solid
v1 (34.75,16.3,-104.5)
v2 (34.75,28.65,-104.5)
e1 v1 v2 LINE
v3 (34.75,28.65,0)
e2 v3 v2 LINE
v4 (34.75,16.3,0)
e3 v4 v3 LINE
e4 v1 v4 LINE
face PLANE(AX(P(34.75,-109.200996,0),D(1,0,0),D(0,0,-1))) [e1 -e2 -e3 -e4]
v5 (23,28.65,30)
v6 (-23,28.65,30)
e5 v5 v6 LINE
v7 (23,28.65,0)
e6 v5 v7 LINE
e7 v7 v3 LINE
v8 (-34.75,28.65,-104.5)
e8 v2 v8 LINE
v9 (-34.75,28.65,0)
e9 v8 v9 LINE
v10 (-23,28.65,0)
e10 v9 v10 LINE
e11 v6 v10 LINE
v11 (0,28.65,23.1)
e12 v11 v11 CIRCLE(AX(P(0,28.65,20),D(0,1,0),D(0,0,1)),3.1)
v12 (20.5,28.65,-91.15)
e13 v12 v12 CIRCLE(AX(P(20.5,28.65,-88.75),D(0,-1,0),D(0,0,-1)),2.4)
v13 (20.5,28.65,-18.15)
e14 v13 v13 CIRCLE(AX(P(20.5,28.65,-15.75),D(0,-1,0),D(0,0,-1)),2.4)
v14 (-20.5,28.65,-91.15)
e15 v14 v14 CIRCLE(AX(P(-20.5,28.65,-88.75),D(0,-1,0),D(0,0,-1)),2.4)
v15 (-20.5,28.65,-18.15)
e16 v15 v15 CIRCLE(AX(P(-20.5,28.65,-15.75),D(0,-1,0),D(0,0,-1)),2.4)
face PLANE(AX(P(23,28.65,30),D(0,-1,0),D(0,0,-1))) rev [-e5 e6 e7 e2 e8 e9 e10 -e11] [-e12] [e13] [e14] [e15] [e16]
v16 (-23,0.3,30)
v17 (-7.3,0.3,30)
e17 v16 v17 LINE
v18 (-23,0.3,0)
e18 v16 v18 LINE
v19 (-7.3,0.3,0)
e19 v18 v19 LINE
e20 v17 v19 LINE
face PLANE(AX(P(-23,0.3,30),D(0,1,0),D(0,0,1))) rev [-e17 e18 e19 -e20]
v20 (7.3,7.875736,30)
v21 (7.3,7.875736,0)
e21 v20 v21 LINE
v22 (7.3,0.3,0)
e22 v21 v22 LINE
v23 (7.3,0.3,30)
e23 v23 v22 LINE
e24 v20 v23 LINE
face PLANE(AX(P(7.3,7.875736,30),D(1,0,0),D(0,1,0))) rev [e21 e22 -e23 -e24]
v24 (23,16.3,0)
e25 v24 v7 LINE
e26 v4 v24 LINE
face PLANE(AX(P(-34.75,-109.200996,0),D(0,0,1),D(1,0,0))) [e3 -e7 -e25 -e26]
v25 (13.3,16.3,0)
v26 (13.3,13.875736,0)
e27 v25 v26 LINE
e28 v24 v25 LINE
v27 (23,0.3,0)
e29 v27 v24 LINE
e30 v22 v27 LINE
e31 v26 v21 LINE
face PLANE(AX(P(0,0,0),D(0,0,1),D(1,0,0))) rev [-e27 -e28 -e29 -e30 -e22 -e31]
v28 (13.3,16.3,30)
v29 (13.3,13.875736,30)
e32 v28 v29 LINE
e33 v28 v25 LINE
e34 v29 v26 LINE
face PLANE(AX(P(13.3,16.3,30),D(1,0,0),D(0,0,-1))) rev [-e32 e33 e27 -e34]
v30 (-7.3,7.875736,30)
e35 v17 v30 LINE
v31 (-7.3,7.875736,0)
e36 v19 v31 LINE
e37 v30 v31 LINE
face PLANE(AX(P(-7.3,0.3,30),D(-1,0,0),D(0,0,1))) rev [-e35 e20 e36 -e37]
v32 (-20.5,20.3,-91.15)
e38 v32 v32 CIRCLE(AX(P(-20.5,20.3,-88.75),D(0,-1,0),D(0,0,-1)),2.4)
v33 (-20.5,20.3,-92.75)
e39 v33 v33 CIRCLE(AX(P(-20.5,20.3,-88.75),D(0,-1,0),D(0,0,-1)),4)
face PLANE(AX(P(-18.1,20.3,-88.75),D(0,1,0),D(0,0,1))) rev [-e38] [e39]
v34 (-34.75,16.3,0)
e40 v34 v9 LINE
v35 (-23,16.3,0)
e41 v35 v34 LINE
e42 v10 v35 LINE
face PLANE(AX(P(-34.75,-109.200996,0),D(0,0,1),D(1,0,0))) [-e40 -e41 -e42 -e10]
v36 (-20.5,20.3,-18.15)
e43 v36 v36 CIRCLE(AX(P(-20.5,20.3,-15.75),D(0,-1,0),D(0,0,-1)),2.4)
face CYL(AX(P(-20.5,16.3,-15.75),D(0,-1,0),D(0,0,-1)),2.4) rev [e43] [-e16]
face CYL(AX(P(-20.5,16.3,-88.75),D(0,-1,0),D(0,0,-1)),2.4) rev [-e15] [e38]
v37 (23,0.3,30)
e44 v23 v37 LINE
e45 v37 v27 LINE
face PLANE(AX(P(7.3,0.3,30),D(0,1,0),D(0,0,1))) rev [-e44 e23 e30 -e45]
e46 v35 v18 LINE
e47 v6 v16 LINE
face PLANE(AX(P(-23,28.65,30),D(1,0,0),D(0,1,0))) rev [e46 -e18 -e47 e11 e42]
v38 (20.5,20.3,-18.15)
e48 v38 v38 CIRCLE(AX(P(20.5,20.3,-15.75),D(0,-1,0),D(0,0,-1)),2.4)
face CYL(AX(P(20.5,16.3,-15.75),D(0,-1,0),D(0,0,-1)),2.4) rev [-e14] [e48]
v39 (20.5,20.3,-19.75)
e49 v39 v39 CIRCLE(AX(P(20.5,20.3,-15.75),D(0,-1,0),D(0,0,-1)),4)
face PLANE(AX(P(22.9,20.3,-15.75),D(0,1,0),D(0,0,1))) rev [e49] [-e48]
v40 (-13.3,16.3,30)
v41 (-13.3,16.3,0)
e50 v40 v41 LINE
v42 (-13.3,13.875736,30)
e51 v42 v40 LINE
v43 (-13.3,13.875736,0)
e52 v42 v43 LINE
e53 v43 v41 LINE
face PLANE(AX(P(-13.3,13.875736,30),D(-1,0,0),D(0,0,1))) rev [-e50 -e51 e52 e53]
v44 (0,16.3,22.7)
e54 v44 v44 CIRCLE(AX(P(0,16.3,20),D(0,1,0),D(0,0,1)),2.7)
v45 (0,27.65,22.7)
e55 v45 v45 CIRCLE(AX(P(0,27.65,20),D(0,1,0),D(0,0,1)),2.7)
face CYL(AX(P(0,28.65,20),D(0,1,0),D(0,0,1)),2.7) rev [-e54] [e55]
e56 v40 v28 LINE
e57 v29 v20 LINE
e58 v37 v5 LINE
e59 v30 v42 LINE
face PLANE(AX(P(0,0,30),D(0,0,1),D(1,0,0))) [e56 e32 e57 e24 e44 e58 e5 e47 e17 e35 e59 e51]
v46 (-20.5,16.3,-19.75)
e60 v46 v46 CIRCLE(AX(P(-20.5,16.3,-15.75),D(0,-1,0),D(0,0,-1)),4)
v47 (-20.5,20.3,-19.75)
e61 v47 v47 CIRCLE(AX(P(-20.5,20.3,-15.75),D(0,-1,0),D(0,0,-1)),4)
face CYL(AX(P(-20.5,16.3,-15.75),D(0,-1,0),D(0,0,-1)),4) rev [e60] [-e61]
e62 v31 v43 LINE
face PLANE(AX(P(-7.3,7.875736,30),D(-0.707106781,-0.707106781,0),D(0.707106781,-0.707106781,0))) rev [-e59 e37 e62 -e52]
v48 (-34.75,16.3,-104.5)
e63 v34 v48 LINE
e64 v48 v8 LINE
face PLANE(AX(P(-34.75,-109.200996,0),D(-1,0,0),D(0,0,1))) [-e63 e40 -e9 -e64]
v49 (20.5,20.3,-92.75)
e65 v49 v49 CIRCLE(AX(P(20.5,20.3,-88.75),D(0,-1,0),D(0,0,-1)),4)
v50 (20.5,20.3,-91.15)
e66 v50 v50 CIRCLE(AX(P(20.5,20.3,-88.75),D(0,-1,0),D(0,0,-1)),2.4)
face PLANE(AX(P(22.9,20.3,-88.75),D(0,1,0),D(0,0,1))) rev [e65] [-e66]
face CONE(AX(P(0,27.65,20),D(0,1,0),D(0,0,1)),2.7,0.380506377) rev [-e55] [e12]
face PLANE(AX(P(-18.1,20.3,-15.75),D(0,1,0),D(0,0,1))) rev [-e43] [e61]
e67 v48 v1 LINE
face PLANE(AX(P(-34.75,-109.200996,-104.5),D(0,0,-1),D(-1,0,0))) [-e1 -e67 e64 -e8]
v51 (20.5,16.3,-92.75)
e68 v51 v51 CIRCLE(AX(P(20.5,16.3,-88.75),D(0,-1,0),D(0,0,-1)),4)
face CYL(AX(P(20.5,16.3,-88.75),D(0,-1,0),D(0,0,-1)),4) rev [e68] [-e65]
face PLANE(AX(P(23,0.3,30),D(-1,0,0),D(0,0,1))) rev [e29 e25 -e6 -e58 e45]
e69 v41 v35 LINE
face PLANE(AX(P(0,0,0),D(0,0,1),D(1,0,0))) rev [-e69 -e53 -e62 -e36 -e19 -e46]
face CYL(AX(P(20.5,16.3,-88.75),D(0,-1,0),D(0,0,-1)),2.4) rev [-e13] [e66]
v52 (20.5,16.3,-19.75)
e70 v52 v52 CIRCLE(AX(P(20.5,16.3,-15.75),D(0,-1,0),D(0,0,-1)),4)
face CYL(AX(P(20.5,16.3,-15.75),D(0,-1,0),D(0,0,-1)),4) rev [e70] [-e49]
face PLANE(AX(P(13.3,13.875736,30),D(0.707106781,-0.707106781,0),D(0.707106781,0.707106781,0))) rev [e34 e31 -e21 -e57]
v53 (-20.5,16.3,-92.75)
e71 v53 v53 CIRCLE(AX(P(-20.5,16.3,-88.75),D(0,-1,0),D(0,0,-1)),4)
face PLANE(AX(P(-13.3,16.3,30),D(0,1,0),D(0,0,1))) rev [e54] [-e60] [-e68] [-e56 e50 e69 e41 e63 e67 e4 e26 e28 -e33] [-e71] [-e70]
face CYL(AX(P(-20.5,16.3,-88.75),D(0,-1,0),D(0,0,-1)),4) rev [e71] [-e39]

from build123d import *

# Parameters (mm, degrees)
BOSS_EXTRUDE1_DEPTH            = 30
HOLE1_D                        = 5.4
HOLE1_CBORE_D                  = 6.2
HOLE1_CBORE_DEPTH              = 1
CHAMFER1_SIZE2                 = 0.4
CHAMFER1_SIZE                  = 1
SKETCH5_W                      = 69.5
SKETCH5_H                      = 104.5
BOSS_EXTRUDE2_DEPTH            = 12.35
CBORE_FOR_M4_SHCS1_D           = 4.8
CBORE_FOR_M4_SHCS1_CBORE_D     = 8
CBORE_FOR_M4_SHCS1_CBORE_DEPTH = 4


with BuildPart() as part:
    # Sketch1 → Boss-Extrude1 (new body)
    with BuildSketch(Plane.XY):
        Polygon((-7.3, 0.3), (-7.3, 7.875735931), (-13.3, 13.875735931), (-13.3, 16.3), (13.3, 16.3), (13.3, 13.875735931), (7.3, 7.875735931), (7.3, 0.3), (23, 0.3), (23, 28.65), (-23, 28.65), (-23, 0.3), align=None)
    extrude(amount=BOSS_EXTRUDE1_DEPTH)

    # Hole1 (through all)
    with Locations(Plane(origin=(0, 28.65, 0), x_dir=(1, 0, 0), z_dir=(0, 1, 0))):
        with Locations((0, -20)):
            CounterBoreHole(HOLE1_D / 2, HOLE1_CBORE_D / 2, HOLE1_CBORE_DEPTH)

    # Chamfer1
    chamfer1_edges = [part.edges().sort_by_distance(p)[0] for p in [
        (-3.1, 27.65, 20),
    ]]
    chamfer1_side = [part.faces().sort_by_distance(p)[0] for p in [
        (-3.1, 27.658, 20),
    ]]
    chamfer(chamfer1_edges, length=CHAMFER1_SIZE - 0.0001, length2=CHAMFER1_SIZE2 - 0.0001, reference=chamfer1_side[0])  # a hair under: the kernel refuses the full size

    # Sketch5 → Boss-Extrude2 (add)
    with BuildSketch(Plane(origin=(0, 28.65, 0), x_dir=(1, 0, 0), z_dir=(0, 1, 0))):
        with Locations((0, 52.25)):
            Rectangle(SKETCH5_W, SKETCH5_H)
    extrude(amount=-BOSS_EXTRUDE2_DEPTH)

    # CBORE for M4 SHCS1 (through all)
    with Locations(Plane(origin=(0, 16.3, 0), x_dir=(-1, 0, 0), z_dir=(0, -1, 0))):
        with Locations((-20.5, 88.75), (20.5, 88.75), (-20.5, 15.75), (20.5, 15.75)):
            CounterBoreHole(CBORE_FOR_M4_SHCS1_D / 2, CBORE_FOR_M4_SHCS1_CBORE_D / 2, CBORE_FOR_M4_SHCS1_CBORE_DEPTH)


solid = part.part
